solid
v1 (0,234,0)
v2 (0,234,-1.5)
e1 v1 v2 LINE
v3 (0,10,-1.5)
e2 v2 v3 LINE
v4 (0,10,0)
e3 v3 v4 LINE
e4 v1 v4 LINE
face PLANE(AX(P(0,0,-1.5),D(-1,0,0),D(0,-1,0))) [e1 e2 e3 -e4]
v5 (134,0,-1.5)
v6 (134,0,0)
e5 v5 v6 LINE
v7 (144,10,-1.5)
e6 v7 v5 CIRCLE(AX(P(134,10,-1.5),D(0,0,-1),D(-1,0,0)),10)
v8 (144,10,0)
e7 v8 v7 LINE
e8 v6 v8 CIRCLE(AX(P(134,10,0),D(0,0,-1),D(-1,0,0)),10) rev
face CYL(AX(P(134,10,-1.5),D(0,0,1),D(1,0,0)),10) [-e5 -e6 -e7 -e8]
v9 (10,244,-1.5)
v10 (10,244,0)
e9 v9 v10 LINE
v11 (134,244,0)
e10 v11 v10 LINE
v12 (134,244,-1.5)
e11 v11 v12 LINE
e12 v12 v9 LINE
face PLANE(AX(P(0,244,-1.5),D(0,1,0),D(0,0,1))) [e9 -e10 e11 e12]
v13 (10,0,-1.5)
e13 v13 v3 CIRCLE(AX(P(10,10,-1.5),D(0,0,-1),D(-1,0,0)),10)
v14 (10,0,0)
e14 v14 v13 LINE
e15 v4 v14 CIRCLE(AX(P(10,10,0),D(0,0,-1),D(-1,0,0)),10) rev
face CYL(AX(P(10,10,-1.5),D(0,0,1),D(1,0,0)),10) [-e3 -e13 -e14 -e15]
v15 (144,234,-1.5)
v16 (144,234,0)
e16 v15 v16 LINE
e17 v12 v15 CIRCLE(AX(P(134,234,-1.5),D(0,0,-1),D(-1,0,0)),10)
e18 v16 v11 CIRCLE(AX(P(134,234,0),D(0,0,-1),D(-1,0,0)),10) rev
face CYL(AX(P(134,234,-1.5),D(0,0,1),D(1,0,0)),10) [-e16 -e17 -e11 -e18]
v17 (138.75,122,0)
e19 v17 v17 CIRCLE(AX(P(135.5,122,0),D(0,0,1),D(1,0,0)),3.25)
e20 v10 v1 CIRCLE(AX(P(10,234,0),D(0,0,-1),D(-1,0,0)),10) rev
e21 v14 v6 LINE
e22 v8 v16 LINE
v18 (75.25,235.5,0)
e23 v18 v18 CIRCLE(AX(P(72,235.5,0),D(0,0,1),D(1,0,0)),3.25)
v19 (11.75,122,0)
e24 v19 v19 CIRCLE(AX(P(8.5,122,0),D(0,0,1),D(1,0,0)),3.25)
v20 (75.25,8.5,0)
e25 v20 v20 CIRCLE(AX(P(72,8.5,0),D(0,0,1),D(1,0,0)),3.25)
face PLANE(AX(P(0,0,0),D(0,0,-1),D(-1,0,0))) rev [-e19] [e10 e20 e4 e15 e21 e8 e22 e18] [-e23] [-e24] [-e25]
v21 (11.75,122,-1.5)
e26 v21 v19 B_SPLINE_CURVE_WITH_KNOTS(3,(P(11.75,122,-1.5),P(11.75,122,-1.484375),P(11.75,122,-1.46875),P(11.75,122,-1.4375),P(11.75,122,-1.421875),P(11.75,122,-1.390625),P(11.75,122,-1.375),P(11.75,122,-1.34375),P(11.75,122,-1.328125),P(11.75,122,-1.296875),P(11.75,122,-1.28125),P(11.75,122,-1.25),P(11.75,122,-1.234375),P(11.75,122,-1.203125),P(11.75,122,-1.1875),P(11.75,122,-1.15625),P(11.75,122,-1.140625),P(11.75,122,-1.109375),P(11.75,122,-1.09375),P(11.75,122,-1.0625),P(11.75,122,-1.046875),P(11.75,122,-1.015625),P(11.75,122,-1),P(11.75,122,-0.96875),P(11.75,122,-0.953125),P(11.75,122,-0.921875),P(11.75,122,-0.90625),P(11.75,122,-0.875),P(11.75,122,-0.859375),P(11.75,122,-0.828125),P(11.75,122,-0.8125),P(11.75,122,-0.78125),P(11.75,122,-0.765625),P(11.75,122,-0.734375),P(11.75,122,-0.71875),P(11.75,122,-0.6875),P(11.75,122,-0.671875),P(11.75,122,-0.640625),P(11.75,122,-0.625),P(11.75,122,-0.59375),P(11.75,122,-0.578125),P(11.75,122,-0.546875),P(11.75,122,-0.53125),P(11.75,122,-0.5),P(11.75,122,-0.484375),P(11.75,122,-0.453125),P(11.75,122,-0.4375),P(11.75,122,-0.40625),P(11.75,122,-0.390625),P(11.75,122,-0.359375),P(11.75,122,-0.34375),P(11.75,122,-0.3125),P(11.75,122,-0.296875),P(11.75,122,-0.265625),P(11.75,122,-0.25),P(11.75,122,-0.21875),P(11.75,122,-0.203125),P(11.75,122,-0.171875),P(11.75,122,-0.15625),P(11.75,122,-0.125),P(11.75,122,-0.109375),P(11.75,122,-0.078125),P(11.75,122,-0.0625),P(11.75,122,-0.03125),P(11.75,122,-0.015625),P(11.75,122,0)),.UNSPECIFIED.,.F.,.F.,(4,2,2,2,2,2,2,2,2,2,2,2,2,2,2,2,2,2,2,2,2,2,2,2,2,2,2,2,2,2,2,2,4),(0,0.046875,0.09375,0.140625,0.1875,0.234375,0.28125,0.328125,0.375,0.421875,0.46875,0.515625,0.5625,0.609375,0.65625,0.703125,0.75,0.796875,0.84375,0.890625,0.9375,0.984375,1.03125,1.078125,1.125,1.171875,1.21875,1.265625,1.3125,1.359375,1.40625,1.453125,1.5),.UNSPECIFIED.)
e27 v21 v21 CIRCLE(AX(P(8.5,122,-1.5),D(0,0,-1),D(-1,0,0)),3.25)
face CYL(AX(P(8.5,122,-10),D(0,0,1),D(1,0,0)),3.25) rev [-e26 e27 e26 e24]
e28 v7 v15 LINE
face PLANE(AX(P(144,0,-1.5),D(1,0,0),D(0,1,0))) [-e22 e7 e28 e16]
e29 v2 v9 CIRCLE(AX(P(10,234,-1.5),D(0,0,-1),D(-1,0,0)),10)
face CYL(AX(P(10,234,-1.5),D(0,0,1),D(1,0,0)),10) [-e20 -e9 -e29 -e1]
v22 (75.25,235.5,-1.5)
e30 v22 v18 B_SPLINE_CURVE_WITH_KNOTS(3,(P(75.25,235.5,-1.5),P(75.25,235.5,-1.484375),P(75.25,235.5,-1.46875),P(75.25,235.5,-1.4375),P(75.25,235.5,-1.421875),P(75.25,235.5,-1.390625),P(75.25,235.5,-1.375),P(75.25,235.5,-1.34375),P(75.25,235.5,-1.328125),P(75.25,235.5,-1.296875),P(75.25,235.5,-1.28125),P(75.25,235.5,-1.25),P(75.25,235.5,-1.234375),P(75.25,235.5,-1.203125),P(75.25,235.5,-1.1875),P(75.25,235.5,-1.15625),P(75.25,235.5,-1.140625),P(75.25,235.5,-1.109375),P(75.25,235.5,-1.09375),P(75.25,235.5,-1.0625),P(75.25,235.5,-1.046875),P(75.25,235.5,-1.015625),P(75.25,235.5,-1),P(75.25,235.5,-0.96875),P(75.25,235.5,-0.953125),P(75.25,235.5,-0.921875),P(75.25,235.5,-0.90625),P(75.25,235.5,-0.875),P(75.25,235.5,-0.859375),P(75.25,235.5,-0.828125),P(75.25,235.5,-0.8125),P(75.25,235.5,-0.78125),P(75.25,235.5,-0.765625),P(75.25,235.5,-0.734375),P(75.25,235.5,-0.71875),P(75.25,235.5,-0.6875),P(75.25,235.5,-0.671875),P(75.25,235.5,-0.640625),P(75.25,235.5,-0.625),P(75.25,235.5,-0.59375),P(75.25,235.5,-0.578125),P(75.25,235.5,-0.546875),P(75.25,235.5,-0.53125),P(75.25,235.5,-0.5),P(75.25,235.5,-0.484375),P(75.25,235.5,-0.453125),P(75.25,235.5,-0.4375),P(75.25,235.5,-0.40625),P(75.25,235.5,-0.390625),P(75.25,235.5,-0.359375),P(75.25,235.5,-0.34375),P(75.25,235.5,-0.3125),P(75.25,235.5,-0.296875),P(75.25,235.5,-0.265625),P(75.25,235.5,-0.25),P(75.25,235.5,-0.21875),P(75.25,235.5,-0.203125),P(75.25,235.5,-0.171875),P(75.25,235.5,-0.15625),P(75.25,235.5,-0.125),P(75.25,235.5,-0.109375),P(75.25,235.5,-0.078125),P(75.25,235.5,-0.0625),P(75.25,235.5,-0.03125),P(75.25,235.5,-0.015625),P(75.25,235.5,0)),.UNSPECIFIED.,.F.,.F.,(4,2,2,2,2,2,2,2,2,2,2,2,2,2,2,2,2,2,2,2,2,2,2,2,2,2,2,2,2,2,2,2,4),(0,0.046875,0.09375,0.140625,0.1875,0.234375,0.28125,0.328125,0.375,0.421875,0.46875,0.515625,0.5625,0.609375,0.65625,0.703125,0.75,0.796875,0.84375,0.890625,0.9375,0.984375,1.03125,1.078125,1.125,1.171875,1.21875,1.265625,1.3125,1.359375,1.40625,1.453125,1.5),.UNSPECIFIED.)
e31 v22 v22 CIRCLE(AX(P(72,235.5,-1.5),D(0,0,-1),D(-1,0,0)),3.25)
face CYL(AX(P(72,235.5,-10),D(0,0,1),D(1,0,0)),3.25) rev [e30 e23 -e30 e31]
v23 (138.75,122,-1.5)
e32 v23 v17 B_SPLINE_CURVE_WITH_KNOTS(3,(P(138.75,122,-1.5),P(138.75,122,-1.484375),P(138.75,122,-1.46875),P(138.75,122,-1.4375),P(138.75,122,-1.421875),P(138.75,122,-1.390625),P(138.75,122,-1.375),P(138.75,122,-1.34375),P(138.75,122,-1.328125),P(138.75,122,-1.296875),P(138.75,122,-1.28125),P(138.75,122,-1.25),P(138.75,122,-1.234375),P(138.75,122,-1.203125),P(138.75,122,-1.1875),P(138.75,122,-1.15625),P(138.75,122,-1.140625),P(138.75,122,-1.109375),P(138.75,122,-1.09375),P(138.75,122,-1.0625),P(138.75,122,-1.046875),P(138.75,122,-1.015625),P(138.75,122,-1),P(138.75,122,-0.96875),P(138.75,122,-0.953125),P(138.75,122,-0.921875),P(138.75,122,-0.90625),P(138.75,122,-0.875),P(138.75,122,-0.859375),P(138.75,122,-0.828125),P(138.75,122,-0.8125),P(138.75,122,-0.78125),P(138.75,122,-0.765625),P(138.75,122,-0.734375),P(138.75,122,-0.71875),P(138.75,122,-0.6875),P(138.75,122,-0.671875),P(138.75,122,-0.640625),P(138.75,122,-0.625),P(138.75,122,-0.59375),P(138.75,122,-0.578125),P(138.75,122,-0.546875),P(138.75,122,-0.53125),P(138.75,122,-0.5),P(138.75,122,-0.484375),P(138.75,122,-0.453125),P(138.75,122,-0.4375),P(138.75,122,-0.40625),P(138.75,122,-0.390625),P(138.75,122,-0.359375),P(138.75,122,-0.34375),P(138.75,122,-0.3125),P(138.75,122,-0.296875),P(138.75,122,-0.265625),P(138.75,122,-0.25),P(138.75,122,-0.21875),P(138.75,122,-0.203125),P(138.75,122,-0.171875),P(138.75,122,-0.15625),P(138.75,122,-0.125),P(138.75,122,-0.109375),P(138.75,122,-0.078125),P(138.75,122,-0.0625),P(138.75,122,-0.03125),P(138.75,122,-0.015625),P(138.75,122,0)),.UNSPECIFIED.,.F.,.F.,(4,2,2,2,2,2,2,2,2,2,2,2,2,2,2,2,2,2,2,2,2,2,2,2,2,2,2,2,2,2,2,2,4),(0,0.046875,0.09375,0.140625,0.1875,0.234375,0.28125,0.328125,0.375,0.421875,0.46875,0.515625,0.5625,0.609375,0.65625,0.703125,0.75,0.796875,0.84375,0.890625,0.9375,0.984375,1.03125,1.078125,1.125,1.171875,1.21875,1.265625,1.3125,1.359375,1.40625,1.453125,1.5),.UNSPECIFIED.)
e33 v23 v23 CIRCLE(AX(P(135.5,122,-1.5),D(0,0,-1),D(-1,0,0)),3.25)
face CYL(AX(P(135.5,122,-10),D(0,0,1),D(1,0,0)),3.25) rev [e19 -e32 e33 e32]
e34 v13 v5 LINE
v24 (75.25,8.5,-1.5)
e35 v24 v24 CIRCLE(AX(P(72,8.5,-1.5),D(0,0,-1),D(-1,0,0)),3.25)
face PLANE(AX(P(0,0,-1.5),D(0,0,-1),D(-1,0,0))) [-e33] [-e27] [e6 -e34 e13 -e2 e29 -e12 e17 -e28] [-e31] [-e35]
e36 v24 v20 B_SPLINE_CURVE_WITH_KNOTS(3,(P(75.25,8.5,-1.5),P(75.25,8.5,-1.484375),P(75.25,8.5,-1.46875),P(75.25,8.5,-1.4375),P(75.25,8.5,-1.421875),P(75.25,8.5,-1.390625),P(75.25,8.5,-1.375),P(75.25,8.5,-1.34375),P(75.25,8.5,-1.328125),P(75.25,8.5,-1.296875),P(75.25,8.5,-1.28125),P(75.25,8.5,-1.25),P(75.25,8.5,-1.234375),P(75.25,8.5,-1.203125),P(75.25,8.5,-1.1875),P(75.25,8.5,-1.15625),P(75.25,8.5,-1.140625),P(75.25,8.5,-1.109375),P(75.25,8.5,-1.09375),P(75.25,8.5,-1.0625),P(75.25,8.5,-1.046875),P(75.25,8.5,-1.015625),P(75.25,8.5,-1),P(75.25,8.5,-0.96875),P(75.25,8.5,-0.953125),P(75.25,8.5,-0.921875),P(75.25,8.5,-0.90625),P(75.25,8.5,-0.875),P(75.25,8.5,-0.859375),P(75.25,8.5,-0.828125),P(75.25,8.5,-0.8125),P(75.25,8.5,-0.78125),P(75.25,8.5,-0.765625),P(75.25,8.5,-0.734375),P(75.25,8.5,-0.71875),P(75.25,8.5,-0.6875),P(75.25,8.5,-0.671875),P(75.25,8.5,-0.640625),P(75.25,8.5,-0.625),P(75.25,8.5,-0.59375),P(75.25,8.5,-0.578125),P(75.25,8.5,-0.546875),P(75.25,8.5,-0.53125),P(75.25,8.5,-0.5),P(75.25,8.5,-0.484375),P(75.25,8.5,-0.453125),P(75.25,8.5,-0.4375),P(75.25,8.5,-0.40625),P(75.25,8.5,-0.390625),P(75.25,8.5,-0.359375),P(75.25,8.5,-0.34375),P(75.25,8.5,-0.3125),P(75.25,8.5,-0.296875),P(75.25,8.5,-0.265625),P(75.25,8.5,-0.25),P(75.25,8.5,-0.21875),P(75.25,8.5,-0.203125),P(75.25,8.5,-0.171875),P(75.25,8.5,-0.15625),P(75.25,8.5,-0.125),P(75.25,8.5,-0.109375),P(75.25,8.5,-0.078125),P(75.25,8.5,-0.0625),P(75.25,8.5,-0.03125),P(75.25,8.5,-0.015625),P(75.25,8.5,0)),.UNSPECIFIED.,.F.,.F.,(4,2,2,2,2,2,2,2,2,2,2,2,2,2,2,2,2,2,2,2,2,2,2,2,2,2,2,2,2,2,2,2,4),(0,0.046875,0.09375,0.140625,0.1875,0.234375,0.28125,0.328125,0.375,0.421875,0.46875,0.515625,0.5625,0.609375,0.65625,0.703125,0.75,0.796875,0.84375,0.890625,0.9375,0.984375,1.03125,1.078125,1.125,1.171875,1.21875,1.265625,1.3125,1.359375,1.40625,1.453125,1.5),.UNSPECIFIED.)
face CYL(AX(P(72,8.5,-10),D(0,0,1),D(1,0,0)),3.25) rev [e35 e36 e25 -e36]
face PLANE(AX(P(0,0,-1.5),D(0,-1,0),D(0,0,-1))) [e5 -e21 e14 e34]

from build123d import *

# Parameters (mm, degrees)
SKETCH1_W          = 144
SKETCH1_H          = 244
BASE_FLANGE1_DEPTH = 1.5
FILLET1_R          = 10
SKETCH6_R          = 3.25
CUT_EXTRUDE1_DEPTH = 10


# Sheet-metal steps are written as plain solids
with BuildPart() as part:
    # Sketch1 → Base-Flange1 (new body)
    with BuildSketch(Plane.XY):
        with Locations((72, 122)):
            Rectangle(SKETCH1_W, SKETCH1_H)
    extrude(amount=-BASE_FLANGE1_DEPTH)

    # Fillet1
    fillet1_edges = [part.edges().sort_by_distance(p)[0] for p in [
        (0, 244, -0.75),
        (144, 244, -0.75),
        (144, 0, -0.75),
        (0, 0, -0.75),
    ]]
    fillet(fillet1_edges, radius=FILLET1_R)

    # Sketch6 → Cut-Extrude1 (cut)
    with BuildSketch(Plane.XY):
        with Locations((72, 235.5)):
            Circle(SKETCH6_R)
        with Locations((72, 8.5)):
            Circle(SKETCH6_R)
        with Locations((8.5, 122)):
            Circle(SKETCH6_R)
        with Locations((135.5, 122)):
            Circle(SKETCH6_R)
    extrude(amount=-CUT_EXTRUDE1_DEPTH, mode=Mode.SUBTRACT)


solid = part.part
